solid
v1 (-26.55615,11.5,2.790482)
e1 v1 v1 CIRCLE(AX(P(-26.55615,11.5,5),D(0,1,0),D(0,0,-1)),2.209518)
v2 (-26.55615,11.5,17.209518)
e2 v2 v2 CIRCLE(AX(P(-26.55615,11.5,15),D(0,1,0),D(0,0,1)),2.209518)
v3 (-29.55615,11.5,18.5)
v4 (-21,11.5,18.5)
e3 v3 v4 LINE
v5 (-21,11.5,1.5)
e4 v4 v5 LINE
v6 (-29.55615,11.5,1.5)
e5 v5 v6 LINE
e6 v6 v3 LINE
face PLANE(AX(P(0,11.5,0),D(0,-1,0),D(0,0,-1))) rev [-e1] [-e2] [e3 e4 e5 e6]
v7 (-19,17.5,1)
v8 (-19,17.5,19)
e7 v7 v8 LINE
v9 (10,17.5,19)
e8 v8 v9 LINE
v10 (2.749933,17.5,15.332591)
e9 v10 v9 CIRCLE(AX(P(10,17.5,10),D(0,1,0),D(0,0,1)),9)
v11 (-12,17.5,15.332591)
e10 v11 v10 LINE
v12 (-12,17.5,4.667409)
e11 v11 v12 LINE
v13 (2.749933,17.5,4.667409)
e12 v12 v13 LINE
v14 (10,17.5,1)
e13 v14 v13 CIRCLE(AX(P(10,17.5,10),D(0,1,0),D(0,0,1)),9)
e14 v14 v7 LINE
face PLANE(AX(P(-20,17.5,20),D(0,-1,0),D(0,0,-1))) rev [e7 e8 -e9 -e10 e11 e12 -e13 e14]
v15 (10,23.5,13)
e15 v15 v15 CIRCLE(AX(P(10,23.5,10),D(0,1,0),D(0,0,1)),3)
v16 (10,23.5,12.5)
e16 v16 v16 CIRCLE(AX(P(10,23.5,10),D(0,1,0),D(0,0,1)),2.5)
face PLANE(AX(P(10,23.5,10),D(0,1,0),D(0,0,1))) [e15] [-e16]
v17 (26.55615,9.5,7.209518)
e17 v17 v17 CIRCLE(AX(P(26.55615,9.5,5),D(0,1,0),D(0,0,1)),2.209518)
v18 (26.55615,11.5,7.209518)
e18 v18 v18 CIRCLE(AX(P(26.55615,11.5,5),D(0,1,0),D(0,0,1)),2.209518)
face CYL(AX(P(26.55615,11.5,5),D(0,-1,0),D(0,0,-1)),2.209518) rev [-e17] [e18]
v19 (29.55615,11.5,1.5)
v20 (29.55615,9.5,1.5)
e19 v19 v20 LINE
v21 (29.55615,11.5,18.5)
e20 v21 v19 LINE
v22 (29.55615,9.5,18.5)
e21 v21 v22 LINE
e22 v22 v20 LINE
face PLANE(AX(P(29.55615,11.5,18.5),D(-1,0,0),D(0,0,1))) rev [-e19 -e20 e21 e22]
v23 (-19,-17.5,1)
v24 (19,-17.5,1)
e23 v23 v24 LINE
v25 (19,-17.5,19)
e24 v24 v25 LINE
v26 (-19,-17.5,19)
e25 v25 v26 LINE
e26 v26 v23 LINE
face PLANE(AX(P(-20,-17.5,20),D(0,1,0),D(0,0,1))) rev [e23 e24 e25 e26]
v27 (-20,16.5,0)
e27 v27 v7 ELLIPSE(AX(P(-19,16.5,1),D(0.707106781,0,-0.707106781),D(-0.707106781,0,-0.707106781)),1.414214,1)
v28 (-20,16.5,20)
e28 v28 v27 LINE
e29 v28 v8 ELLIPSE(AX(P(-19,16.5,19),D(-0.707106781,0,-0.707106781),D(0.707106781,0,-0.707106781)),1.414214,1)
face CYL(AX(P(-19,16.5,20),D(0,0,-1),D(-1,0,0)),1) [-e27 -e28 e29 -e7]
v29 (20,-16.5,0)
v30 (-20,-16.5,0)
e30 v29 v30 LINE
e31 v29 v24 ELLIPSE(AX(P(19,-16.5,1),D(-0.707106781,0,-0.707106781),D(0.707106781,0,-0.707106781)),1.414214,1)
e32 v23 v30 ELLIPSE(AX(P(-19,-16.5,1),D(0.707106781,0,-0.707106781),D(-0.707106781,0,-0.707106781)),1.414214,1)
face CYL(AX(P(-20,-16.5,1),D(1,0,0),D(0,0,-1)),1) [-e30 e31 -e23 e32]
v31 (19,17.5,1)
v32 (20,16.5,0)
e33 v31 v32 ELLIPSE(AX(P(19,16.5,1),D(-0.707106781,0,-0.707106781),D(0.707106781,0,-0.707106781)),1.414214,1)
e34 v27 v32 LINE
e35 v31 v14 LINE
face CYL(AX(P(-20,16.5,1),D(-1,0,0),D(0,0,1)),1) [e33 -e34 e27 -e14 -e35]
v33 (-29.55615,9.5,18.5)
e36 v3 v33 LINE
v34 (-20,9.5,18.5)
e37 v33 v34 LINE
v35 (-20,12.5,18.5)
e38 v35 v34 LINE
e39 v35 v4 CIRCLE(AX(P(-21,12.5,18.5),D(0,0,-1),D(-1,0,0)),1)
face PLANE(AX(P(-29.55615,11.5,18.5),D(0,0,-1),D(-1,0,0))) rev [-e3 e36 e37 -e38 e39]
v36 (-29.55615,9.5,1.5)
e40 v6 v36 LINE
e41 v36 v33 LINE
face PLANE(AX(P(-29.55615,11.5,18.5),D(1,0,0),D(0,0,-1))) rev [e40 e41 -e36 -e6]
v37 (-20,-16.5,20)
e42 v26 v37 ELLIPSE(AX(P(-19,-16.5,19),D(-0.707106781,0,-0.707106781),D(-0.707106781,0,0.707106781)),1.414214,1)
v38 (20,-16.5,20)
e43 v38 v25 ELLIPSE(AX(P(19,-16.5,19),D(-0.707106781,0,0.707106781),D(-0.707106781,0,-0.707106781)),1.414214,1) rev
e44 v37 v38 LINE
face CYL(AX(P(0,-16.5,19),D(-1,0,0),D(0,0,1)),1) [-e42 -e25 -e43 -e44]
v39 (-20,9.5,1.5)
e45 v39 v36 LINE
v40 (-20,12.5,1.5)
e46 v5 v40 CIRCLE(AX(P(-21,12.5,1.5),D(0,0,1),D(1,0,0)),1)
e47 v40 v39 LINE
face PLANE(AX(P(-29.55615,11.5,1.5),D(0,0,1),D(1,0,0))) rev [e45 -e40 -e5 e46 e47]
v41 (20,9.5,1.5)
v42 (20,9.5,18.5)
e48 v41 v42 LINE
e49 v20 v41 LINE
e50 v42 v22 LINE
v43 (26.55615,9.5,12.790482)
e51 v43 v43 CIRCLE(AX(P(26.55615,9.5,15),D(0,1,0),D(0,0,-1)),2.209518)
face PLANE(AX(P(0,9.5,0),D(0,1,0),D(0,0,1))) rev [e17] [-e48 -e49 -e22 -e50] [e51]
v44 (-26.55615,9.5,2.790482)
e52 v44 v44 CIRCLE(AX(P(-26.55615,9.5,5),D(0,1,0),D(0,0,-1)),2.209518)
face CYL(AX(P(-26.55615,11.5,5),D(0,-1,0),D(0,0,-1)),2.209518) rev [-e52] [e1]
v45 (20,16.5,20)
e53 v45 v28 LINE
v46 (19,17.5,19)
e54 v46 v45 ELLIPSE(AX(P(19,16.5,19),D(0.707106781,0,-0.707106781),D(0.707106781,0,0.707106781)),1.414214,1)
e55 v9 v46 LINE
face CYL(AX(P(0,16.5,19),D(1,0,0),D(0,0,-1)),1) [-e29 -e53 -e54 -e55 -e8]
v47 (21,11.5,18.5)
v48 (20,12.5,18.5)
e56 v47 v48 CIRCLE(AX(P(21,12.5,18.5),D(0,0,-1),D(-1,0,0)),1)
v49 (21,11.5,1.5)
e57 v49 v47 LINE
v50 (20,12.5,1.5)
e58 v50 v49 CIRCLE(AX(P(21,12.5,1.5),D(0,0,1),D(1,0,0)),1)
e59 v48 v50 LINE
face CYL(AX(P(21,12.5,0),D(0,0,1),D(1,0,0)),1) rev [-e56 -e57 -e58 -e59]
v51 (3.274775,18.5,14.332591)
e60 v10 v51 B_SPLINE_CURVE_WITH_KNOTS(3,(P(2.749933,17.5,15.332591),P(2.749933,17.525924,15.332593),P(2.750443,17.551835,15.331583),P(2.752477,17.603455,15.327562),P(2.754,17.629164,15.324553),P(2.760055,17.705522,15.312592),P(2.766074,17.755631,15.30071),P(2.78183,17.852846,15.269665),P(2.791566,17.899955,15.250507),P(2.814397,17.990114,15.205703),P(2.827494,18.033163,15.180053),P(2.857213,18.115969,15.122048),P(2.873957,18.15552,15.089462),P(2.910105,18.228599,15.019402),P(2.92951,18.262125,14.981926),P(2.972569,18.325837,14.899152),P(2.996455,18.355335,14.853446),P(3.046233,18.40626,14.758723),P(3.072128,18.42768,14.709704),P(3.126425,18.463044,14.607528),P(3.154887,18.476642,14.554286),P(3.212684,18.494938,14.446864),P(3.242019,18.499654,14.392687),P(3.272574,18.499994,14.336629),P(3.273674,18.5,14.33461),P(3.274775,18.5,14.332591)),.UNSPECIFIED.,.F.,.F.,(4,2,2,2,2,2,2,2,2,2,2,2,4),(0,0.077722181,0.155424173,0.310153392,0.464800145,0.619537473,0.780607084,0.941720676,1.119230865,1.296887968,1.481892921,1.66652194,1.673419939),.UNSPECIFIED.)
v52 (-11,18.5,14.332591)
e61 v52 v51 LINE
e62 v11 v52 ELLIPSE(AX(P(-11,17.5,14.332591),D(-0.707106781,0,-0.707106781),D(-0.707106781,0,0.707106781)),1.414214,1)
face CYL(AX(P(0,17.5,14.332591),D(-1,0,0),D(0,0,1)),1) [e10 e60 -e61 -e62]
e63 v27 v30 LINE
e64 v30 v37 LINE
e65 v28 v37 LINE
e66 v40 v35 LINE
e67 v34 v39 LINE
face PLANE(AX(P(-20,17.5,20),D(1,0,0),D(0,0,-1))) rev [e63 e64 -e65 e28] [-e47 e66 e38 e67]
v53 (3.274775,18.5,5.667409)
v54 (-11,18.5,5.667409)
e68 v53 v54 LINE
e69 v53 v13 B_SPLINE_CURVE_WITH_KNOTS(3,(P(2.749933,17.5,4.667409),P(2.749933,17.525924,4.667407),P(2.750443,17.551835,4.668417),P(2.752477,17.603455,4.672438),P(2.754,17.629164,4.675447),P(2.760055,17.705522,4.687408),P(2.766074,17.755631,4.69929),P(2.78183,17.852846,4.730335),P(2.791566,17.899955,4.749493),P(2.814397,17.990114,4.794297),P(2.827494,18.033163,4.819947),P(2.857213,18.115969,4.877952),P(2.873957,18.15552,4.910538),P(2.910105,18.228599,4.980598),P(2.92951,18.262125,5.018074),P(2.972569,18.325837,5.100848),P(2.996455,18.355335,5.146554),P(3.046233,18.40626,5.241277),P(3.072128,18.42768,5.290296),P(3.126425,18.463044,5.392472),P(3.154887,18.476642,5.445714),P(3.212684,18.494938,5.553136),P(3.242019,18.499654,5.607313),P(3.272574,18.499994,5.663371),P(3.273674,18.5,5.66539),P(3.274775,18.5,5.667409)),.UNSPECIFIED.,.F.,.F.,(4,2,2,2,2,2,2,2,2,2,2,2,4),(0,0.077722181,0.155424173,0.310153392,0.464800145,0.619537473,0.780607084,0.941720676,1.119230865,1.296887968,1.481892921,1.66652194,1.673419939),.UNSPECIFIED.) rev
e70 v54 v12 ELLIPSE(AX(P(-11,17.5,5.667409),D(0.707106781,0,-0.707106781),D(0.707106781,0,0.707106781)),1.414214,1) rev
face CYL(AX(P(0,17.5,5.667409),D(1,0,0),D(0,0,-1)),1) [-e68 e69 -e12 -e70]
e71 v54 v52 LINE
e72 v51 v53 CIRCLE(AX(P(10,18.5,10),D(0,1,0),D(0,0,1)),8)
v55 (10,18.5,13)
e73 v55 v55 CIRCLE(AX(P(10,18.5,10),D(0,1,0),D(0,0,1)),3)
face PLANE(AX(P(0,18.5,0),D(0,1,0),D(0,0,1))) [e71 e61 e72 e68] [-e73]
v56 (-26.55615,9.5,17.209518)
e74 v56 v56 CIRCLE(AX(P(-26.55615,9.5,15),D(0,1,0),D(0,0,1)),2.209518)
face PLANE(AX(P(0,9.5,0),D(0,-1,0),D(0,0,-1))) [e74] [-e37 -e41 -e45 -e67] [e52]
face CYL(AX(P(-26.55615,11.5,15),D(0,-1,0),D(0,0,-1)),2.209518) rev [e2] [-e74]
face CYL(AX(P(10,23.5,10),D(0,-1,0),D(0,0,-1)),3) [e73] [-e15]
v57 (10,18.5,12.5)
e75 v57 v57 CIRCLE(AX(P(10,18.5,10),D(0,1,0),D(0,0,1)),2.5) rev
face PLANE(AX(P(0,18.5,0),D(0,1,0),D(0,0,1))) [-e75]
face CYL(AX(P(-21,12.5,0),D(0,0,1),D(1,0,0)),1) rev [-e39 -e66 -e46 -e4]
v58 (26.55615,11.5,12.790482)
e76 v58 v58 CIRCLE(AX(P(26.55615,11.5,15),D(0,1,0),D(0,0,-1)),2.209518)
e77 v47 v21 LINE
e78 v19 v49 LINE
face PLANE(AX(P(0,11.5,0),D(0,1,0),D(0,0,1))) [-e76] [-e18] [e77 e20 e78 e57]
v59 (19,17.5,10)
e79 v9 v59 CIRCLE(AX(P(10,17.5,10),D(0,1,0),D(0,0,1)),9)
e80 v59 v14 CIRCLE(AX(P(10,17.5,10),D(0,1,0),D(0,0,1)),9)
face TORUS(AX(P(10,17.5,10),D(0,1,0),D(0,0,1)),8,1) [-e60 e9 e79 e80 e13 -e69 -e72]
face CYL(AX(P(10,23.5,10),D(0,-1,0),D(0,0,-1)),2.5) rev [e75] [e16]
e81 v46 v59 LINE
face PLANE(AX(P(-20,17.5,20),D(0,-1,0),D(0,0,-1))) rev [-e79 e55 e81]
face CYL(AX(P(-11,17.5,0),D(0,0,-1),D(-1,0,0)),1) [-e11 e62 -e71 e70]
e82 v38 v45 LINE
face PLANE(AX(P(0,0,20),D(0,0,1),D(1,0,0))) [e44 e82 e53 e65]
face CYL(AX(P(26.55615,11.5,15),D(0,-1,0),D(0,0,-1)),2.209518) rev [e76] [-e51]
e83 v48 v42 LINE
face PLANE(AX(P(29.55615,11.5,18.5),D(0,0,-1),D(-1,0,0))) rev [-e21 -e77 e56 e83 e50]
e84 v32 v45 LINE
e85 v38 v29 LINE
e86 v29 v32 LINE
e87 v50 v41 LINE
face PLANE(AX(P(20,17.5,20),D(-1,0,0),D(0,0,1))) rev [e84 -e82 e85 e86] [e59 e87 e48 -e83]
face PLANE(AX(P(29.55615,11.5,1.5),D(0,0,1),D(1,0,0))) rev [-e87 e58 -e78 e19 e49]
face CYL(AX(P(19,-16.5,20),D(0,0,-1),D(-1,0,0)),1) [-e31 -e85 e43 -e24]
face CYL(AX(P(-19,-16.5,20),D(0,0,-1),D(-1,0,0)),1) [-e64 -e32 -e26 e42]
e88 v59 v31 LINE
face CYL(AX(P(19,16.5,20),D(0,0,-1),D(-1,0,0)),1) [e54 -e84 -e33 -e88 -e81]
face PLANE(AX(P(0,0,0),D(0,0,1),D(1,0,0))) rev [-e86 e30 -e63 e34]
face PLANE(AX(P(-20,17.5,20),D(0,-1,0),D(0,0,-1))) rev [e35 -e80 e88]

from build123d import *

# Parameters (mm, degrees)
SKETCH1_W           = 40
SKETCH1_H           = 35
BOSS_EXTRUDE1_DEPTH = 20
FILLET1_R           = 1
SKETCH2_W           = 9.556150209
SKETCH2_H           = 17
SKETCH2_R           = 2.209517665
BOSS_EXTRUDE2_DEPTH = 2
BOSS_EXTRUDE3_DEPTH = 1
SKETCH4_R           = 3
SKETCH4_R_2         = 2.5
BOSS_EXTRUDE4_DEPTH = 5
FILLET2_R           = 1


with BuildPart() as part:
    # Sketch1 → Boss-Extrude1 (new body)
    with BuildSketch(Plane.XY):
        Rectangle(SKETCH1_W, SKETCH1_H)
    extrude(amount=BOSS_EXTRUDE1_DEPTH)

    # Fillet1
    fillet1_edges = [part.edges().sort_by_distance(p)[0] for p in [
        (0, -17.5, 20),
        (0, -17.5, 0),
        (0, 17.5, 0),
        (20, -17.5, 10),
        (-20, -17.5, 10),
        (-20, 17.5, 10),
        (20, 17.5, 10),
        (0, 17.5, 20),
    ]]
    fillet(fillet1_edges, radius=FILLET1_R)

    # Sketch2 → Boss-Extrude2 (add)
    # profile 1 of 2: a face of its own
    with BuildSketch(Plane(origin=(0, 9.5, 0), x_dir=(-1, 0, 0), z_dir=(0, 1, 0))):
        with Locations((24.778075105, 10)):
            Rectangle(SKETCH2_W, SKETCH2_H)
        with Locations(Location((26.556150209, 5, 0), (0, 0, 270))):
            Circle(SKETCH2_R, mode=Mode.SUBTRACT)
        with Locations(Location((26.556150209, 15, 0), (0, 0, 90))):
            Circle(SKETCH2_R, mode=Mode.SUBTRACT)
    # profile 2 of 2: a face of its own
    with BuildSketch(Plane(origin=(0, 9.5, 0), x_dir=(-1, 0, 0), z_dir=(0, 1, 0))):
        with Locations((-24.778075105, 10)):
            Rectangle(SKETCH2_W, SKETCH2_H)
        with Locations(Location((-26.556150209, 5, 0), (0, 0, 90))):
            Circle(SKETCH2_R, mode=Mode.SUBTRACT)
        with Locations(Location((-26.556150209, 15, 0), (0, 0, 270))):
            Circle(SKETCH2_R, mode=Mode.SUBTRACT)
    extrude(amount=BOSS_EXTRUDE2_DEPTH)

    # Sketch3 → Boss-Extrude3 (add)
    with BuildSketch(Plane(origin=(0, 17.5, 0), x_dir=(1, 0, 0), z_dir=(0, 1, 0))):
        with BuildLine():
            Line((2.749933149, -4.667408636), (-12, -4.667408636))
            Line((-12, -4.667408636), (-12, -15.332591364))
            Line((-12, -15.332591364), (2.749933149, -15.332591364))
            ThreePointArc((2.749933149, -15.332591364), (19, -10), (2.749933149, -4.667408636))
        make_face()
    extrude(amount=BOSS_EXTRUDE3_DEPTH)

    # Sketch4 → Boss-Extrude4 (add)
    with BuildSketch(Plane(origin=(0, 18.5, 0), x_dir=(1, 0, 0), z_dir=(0, 1, 0))):
        with Locations(Location((10, -10, 0), (0, 0, 270))):
            Circle(SKETCH4_R)
        with Locations(Location((10, -10, 0), (0, 0, 270))):
            Circle(SKETCH4_R_2, mode=Mode.SUBTRACT)
    extrude(amount=BOSS_EXTRUDE4_DEPTH)

    # Fillet2
    fillet2_edges = [part.edges().sort_by_distance(p)[0] for p in [
        (20, 11.5, 10),
        (-20, 11.5, 10),
        (-12, 18.5, 10),
        (-4.625033426, 18.5, 4.667408636),
        (19, 18.5, 10),
        (-4.625033426, 18.5, 15.332591364),
    ]]
    fillet(fillet2_edges, radius=FILLET2_R - 0.0001)  # a hair under: the kernel refuses the full size


solid = part.part
